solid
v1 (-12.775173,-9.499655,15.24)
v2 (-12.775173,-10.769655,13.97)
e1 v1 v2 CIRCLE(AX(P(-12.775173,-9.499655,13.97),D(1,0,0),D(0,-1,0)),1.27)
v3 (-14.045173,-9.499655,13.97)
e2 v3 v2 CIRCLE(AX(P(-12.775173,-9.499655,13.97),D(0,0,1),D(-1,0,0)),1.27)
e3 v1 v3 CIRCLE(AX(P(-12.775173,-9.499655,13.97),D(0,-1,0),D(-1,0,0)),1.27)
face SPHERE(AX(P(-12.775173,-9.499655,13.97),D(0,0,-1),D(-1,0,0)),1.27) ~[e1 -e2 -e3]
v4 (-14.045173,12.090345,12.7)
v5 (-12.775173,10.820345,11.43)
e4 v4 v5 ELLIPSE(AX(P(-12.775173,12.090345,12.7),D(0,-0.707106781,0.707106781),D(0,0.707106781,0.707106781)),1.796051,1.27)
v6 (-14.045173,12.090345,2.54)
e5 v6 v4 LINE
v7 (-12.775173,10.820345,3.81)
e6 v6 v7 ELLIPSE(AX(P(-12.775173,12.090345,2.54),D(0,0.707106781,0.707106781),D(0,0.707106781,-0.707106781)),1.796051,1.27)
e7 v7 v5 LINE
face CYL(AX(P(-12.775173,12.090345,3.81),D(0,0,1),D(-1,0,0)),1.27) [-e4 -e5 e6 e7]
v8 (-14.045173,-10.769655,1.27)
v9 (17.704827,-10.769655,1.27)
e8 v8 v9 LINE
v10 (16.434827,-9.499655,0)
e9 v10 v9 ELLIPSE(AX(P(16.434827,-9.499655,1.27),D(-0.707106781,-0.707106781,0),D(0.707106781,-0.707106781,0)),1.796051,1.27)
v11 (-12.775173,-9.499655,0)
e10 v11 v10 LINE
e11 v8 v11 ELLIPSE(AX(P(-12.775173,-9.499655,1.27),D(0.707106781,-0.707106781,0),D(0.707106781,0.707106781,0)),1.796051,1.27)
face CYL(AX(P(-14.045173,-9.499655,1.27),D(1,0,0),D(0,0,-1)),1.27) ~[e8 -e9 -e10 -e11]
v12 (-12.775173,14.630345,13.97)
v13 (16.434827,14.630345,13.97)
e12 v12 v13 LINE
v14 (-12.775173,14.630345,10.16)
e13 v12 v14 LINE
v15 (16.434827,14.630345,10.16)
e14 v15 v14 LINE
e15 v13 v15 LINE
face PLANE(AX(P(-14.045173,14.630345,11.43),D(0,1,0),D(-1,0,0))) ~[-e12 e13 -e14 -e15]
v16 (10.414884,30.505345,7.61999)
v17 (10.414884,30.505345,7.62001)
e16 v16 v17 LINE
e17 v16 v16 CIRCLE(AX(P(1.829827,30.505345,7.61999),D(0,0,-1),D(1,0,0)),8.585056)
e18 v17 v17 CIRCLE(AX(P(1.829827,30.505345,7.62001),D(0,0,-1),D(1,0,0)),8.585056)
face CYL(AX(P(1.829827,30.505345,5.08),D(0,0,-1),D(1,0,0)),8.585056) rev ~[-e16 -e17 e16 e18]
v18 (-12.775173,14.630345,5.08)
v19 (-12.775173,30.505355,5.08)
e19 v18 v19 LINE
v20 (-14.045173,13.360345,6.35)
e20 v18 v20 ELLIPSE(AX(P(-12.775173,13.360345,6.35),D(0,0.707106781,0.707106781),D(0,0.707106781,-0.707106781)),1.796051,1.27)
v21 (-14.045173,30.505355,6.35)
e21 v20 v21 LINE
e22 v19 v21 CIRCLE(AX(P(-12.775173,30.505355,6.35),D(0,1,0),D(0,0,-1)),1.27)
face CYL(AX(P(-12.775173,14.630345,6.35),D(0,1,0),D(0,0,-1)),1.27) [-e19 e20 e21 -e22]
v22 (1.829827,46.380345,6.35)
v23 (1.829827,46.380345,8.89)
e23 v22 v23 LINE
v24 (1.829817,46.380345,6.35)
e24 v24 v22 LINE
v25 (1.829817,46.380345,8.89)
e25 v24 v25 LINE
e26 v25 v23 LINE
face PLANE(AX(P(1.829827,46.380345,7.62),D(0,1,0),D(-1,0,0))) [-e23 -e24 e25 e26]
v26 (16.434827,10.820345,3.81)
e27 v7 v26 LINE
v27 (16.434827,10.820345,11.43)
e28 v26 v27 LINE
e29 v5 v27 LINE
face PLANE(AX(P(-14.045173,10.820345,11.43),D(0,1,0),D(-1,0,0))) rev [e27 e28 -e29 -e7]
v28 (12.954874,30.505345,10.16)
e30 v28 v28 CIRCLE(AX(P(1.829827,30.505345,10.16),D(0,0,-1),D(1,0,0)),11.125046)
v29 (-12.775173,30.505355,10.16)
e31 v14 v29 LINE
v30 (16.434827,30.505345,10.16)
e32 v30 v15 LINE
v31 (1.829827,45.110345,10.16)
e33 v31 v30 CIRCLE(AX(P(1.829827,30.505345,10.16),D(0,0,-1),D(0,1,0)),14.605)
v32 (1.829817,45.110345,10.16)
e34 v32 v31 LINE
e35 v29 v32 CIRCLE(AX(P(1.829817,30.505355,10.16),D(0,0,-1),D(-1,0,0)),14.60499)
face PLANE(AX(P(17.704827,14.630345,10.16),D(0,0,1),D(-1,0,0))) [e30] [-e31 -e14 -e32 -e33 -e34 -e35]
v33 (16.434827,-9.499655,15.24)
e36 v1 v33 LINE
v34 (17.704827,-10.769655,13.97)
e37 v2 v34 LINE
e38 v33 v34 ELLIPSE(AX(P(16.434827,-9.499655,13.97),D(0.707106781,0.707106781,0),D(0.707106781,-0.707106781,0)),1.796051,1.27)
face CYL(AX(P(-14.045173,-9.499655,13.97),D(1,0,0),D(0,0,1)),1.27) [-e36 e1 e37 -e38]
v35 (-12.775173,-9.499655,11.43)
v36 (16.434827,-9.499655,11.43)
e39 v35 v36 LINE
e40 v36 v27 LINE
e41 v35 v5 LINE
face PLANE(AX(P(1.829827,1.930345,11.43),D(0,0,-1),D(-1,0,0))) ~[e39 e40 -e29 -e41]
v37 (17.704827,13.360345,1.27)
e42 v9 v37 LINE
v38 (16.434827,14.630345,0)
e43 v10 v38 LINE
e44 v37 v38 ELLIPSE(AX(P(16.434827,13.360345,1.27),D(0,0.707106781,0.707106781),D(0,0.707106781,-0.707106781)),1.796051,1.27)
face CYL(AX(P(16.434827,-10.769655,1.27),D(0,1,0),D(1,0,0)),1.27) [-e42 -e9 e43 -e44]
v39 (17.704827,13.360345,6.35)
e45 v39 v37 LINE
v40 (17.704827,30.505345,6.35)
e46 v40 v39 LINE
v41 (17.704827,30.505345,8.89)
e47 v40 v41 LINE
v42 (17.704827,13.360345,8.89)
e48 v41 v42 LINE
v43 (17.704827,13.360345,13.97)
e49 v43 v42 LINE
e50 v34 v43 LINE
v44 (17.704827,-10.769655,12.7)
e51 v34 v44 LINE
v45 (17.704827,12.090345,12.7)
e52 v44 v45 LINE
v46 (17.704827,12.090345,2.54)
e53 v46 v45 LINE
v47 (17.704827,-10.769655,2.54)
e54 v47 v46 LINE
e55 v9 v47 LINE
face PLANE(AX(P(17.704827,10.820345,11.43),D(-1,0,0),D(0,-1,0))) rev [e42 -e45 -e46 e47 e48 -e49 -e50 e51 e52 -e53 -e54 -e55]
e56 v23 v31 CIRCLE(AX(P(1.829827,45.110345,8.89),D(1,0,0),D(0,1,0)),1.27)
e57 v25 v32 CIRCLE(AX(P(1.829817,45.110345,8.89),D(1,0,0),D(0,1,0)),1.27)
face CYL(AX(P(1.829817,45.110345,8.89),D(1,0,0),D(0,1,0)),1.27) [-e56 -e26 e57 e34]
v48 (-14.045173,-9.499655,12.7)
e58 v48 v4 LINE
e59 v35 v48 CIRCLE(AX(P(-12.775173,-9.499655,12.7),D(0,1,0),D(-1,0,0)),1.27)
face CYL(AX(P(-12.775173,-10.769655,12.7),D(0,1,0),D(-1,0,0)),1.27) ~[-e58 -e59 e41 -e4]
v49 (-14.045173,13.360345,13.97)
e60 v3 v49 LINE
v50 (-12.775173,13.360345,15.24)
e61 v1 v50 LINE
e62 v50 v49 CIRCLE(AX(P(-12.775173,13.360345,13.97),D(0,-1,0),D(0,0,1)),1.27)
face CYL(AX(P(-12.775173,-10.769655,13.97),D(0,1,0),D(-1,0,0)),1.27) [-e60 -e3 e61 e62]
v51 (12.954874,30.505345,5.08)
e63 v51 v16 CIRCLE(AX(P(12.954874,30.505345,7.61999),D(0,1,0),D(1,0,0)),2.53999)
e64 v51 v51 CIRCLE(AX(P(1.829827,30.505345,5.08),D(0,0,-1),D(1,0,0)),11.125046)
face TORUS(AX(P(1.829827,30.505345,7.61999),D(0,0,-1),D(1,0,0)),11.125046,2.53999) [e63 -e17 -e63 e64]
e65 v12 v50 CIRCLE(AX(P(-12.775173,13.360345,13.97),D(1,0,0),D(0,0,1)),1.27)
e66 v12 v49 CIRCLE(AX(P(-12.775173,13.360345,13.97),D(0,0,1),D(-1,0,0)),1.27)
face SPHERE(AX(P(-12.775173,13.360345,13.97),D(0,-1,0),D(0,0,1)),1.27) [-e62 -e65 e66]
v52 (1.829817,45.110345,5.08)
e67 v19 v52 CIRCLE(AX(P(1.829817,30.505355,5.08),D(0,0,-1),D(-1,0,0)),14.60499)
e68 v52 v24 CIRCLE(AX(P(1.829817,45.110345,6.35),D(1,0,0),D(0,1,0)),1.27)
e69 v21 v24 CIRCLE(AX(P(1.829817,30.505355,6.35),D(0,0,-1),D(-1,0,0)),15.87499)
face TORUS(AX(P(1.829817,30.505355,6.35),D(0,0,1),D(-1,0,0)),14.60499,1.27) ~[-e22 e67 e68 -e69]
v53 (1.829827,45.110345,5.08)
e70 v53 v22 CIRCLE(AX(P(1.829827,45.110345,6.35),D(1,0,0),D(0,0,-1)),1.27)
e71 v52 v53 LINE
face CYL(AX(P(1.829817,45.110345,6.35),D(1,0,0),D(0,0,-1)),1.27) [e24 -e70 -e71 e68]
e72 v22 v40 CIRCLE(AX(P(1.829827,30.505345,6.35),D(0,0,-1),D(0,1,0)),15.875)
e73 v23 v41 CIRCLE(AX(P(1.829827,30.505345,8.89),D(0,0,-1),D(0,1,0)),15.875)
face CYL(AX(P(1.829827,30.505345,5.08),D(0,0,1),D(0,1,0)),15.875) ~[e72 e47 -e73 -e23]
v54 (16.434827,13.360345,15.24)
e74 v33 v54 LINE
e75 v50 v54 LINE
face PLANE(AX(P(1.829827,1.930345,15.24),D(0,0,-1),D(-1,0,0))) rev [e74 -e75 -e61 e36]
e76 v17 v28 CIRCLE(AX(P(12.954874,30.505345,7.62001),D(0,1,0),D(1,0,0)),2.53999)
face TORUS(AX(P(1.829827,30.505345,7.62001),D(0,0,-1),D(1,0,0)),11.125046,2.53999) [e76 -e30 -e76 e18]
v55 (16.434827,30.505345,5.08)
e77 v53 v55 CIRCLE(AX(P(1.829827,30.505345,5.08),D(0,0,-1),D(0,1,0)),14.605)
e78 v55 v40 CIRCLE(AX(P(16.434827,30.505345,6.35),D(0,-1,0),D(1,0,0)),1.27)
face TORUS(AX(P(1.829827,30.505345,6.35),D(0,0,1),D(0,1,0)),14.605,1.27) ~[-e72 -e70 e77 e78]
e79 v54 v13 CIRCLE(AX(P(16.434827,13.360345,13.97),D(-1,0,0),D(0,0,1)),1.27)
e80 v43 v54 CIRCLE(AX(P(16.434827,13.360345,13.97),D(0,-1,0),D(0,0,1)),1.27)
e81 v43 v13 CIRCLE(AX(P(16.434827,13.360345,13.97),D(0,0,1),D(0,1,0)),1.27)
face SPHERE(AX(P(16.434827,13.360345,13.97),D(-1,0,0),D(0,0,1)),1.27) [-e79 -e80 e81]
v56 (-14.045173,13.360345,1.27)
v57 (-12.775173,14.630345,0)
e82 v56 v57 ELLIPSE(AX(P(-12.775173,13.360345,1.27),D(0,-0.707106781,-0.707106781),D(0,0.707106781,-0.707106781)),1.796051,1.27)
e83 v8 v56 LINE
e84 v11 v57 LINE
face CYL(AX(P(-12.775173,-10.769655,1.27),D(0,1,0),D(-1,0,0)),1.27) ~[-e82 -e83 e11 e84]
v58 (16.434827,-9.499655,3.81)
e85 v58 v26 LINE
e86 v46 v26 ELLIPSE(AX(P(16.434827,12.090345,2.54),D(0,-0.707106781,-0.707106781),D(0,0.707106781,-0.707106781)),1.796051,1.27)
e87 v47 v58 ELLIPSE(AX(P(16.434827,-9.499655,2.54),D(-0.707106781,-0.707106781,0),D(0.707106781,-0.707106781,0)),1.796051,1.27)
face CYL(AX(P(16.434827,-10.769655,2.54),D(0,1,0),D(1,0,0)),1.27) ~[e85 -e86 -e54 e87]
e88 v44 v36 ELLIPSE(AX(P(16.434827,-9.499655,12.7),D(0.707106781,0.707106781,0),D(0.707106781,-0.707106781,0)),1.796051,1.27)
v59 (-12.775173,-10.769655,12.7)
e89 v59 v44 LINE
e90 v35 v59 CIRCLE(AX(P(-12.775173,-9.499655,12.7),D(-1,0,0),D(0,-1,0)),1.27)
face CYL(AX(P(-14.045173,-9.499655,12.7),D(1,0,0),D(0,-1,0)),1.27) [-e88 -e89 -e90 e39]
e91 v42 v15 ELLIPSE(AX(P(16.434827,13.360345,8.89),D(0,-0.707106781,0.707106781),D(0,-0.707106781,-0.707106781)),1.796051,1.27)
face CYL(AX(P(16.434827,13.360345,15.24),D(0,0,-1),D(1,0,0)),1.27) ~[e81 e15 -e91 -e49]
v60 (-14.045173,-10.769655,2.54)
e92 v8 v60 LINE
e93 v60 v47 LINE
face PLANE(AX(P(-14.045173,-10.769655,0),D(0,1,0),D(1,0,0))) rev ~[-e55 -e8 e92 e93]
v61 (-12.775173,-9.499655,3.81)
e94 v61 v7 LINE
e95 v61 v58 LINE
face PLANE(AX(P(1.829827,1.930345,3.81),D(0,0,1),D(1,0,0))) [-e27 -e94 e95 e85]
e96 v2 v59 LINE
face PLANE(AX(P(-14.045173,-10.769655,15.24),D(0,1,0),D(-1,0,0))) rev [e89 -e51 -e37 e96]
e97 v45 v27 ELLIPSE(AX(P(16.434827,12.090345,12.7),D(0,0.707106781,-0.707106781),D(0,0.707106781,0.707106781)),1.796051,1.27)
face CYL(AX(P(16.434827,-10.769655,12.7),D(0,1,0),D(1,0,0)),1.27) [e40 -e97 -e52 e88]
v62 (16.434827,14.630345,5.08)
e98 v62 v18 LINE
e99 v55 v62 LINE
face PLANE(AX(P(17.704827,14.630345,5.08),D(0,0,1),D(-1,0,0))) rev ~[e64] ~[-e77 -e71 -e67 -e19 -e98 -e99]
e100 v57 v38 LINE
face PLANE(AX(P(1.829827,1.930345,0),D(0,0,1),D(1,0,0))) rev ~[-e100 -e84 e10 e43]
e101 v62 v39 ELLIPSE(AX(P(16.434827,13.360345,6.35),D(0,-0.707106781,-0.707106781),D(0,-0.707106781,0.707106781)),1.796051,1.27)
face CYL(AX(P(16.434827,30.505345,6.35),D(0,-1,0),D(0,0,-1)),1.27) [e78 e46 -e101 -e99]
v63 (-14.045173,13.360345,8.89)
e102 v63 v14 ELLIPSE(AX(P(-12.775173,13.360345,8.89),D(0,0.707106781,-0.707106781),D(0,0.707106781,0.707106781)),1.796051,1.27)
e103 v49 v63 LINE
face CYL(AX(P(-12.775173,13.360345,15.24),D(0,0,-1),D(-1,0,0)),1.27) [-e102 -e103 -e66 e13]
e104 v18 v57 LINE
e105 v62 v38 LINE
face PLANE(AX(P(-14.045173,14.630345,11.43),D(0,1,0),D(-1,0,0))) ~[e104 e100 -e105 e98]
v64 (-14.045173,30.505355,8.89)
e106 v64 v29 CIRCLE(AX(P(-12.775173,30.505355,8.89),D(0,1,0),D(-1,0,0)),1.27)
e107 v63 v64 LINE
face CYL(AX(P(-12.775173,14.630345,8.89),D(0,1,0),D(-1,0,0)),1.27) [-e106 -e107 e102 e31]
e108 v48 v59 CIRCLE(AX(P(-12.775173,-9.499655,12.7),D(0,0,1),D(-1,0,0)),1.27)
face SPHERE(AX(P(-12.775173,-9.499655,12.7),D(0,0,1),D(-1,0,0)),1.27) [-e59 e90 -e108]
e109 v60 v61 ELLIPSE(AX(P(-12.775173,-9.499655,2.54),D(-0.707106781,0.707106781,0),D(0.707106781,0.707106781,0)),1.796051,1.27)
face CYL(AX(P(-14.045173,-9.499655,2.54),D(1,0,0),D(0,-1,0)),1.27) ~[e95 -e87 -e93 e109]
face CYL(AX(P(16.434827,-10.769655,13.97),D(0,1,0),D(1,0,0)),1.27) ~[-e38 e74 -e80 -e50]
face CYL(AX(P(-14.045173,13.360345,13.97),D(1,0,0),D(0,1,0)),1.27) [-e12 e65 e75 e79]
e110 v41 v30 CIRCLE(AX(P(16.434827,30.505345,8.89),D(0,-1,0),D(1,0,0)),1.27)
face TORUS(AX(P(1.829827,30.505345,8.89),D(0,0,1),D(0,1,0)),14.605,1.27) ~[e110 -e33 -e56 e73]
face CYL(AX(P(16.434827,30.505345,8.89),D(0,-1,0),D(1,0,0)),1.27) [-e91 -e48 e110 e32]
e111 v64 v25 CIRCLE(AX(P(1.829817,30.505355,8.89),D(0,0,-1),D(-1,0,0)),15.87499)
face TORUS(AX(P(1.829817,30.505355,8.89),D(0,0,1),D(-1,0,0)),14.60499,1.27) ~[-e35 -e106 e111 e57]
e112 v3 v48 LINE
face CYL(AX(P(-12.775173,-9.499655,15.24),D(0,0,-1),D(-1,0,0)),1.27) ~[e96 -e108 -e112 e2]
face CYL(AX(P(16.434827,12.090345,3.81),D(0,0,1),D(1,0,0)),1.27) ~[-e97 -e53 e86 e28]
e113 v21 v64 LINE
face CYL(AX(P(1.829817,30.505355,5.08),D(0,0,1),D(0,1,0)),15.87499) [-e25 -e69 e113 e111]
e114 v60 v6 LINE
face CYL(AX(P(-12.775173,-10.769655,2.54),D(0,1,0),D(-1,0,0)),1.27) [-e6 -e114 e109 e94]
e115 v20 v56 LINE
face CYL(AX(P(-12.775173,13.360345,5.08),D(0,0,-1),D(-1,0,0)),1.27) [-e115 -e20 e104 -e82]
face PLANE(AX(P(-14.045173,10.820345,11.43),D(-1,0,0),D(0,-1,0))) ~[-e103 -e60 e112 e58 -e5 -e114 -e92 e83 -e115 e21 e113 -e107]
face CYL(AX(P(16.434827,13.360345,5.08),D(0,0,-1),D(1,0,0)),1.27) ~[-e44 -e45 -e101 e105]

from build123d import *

# Parameters (mm, degrees)
F0_W     = 31.75
F0_H     = 25.4
F1_DEPTH = 3.81
F2_W     = 31.75
F2_H     = 3.81
F3_DEPTH = 3.81
F5_W     = 31.75
F5_H     = 5.08
F6_DEPTH = 31.75
F7_R     = 8.5850562929
F8_DEPTH = 10.161
F9_R     = 15.875
F10_R    = 15.87499
F11_R    = 1.27
F12_R    = 2.53999


# Not quite as in the source:
# - a fillet or chamfer is up to 0.001 mm smaller than in the source, because OpenCascade refuses the exact size


with BuildPart() as f1:
    # F0 (on Top) → F1 (new body)
    with BuildSketch(Plane.XY):
        with Locations((1.8298272586, 1.9303451554)):
            Rectangle(F0_W, F0_H)
    extrude(amount=F1_DEPTH)

    # F2 (on face) → F3 (join)
    with BuildSketch(Plane.XY.offset(3.81)):
        with Locations((1.8298272586, 12.7253451554)):
            Rectangle(F2_W, F2_H)
    extrude(amount=F3_DEPTH)

    # F4: F1 across face


with BuildPart() as f1_1:
    add(f1.part)
    add(f1.part.mirror(Plane(origin=(1.8298272586, 12.7253451554, 7.62), x_dir=(1, 0, 0), z_dir=(0, 0, 1))))

    # F5 (on face) → F6 (join)
    with BuildSketch(Plane(origin=(0, 14.6303451554, 0), x_dir=(-1, 0, 0), z_dir=(0, 1, 0))):
        with Locations((-1.8298272586, 7.62)):
            Rectangle(F5_W, F5_H)
    extrude(amount=F6_DEPTH)

    # F7 (on face) → F8 (cut, through all)
    with BuildSketch(Plane(origin=(0, 0, 5.08), x_dir=(1, 0, 0), z_dir=(0, 0, -1))):
        with Locations((1.8298272586, -30.5053451554)):
            Circle(F7_R)
    extrude(amount=-F8_DEPTH, mode=Mode.SUBTRACT)

    # F9
    f9_edges = [f1_1.edges().sort_by_distance(p)[0] for p in [
        (17.704827, 46.380345, 7.62),
    ]]
    fillet(f9_edges, radius=F9_R)

    # F10 (radius 15.875 in the source; OpenCascade refuses exactly that, so slightly less here)
    f10_edges = [f1_1.edges().sort_by_distance(p)[0] for p in [
        (-14.045173, 46.380345, 7.62),
    ]]
    fillet(f10_edges, radius=F10_R)

    # F11
    f11_edges = [f1_1.edges().sort_by_distance(p)[0] for p in [
        (-14.045173, -10.769655, 13.335),
        (-14.045173, 0.025345, 11.43),
        (-14.045173, 1.930345, 15.24),
        (-14.045173, 0.025345, 3.81),
        (-14.045173, 1.930345, 0),
        (-14.045173, 10.820345, 7.62),
        (-14.045173, 22.56785, 10.16),
        (-14.045173, 22.56785, 5.08),
        (1.829827, 14.630345, 15.24),
        (-14.045173, 14.630345, 12.7),
        (-14.045173, 14.630345, 2.54),
        (1.829827, -10.769655, 3.81),
        (1.829827, -10.769655, 11.43),
        (1.829827, -10.769655, 0),
        (1.829827, -10.769655, 15.24),
        (17.704827, 1.930345, 15.24),
        (17.704827, 0.025345, 11.43),
        (17.704827, 0.025345, 3.81),
        (17.704827, 1.930345, 0),
        (17.704827, 14.630345, 2.54),
        (17.704827, 14.630345, 12.7),
        (17.704827, 10.820345, 7.62),
    ]]
    fillet(f11_edges, radius=F11_R)

    # F12 (radius 2.54 in the source; OpenCascade refuses exactly that, so slightly less here)
    f12_edges = [f1_1.edges().sort_by_distance(p)[0] for p in [
        (-6.755229, 30.505345, 10.16),
        (-6.755229, 30.505345, 5.08),
    ]]
    fillet(f12_edges, radius=F12_R)


solid = f1_1.part
